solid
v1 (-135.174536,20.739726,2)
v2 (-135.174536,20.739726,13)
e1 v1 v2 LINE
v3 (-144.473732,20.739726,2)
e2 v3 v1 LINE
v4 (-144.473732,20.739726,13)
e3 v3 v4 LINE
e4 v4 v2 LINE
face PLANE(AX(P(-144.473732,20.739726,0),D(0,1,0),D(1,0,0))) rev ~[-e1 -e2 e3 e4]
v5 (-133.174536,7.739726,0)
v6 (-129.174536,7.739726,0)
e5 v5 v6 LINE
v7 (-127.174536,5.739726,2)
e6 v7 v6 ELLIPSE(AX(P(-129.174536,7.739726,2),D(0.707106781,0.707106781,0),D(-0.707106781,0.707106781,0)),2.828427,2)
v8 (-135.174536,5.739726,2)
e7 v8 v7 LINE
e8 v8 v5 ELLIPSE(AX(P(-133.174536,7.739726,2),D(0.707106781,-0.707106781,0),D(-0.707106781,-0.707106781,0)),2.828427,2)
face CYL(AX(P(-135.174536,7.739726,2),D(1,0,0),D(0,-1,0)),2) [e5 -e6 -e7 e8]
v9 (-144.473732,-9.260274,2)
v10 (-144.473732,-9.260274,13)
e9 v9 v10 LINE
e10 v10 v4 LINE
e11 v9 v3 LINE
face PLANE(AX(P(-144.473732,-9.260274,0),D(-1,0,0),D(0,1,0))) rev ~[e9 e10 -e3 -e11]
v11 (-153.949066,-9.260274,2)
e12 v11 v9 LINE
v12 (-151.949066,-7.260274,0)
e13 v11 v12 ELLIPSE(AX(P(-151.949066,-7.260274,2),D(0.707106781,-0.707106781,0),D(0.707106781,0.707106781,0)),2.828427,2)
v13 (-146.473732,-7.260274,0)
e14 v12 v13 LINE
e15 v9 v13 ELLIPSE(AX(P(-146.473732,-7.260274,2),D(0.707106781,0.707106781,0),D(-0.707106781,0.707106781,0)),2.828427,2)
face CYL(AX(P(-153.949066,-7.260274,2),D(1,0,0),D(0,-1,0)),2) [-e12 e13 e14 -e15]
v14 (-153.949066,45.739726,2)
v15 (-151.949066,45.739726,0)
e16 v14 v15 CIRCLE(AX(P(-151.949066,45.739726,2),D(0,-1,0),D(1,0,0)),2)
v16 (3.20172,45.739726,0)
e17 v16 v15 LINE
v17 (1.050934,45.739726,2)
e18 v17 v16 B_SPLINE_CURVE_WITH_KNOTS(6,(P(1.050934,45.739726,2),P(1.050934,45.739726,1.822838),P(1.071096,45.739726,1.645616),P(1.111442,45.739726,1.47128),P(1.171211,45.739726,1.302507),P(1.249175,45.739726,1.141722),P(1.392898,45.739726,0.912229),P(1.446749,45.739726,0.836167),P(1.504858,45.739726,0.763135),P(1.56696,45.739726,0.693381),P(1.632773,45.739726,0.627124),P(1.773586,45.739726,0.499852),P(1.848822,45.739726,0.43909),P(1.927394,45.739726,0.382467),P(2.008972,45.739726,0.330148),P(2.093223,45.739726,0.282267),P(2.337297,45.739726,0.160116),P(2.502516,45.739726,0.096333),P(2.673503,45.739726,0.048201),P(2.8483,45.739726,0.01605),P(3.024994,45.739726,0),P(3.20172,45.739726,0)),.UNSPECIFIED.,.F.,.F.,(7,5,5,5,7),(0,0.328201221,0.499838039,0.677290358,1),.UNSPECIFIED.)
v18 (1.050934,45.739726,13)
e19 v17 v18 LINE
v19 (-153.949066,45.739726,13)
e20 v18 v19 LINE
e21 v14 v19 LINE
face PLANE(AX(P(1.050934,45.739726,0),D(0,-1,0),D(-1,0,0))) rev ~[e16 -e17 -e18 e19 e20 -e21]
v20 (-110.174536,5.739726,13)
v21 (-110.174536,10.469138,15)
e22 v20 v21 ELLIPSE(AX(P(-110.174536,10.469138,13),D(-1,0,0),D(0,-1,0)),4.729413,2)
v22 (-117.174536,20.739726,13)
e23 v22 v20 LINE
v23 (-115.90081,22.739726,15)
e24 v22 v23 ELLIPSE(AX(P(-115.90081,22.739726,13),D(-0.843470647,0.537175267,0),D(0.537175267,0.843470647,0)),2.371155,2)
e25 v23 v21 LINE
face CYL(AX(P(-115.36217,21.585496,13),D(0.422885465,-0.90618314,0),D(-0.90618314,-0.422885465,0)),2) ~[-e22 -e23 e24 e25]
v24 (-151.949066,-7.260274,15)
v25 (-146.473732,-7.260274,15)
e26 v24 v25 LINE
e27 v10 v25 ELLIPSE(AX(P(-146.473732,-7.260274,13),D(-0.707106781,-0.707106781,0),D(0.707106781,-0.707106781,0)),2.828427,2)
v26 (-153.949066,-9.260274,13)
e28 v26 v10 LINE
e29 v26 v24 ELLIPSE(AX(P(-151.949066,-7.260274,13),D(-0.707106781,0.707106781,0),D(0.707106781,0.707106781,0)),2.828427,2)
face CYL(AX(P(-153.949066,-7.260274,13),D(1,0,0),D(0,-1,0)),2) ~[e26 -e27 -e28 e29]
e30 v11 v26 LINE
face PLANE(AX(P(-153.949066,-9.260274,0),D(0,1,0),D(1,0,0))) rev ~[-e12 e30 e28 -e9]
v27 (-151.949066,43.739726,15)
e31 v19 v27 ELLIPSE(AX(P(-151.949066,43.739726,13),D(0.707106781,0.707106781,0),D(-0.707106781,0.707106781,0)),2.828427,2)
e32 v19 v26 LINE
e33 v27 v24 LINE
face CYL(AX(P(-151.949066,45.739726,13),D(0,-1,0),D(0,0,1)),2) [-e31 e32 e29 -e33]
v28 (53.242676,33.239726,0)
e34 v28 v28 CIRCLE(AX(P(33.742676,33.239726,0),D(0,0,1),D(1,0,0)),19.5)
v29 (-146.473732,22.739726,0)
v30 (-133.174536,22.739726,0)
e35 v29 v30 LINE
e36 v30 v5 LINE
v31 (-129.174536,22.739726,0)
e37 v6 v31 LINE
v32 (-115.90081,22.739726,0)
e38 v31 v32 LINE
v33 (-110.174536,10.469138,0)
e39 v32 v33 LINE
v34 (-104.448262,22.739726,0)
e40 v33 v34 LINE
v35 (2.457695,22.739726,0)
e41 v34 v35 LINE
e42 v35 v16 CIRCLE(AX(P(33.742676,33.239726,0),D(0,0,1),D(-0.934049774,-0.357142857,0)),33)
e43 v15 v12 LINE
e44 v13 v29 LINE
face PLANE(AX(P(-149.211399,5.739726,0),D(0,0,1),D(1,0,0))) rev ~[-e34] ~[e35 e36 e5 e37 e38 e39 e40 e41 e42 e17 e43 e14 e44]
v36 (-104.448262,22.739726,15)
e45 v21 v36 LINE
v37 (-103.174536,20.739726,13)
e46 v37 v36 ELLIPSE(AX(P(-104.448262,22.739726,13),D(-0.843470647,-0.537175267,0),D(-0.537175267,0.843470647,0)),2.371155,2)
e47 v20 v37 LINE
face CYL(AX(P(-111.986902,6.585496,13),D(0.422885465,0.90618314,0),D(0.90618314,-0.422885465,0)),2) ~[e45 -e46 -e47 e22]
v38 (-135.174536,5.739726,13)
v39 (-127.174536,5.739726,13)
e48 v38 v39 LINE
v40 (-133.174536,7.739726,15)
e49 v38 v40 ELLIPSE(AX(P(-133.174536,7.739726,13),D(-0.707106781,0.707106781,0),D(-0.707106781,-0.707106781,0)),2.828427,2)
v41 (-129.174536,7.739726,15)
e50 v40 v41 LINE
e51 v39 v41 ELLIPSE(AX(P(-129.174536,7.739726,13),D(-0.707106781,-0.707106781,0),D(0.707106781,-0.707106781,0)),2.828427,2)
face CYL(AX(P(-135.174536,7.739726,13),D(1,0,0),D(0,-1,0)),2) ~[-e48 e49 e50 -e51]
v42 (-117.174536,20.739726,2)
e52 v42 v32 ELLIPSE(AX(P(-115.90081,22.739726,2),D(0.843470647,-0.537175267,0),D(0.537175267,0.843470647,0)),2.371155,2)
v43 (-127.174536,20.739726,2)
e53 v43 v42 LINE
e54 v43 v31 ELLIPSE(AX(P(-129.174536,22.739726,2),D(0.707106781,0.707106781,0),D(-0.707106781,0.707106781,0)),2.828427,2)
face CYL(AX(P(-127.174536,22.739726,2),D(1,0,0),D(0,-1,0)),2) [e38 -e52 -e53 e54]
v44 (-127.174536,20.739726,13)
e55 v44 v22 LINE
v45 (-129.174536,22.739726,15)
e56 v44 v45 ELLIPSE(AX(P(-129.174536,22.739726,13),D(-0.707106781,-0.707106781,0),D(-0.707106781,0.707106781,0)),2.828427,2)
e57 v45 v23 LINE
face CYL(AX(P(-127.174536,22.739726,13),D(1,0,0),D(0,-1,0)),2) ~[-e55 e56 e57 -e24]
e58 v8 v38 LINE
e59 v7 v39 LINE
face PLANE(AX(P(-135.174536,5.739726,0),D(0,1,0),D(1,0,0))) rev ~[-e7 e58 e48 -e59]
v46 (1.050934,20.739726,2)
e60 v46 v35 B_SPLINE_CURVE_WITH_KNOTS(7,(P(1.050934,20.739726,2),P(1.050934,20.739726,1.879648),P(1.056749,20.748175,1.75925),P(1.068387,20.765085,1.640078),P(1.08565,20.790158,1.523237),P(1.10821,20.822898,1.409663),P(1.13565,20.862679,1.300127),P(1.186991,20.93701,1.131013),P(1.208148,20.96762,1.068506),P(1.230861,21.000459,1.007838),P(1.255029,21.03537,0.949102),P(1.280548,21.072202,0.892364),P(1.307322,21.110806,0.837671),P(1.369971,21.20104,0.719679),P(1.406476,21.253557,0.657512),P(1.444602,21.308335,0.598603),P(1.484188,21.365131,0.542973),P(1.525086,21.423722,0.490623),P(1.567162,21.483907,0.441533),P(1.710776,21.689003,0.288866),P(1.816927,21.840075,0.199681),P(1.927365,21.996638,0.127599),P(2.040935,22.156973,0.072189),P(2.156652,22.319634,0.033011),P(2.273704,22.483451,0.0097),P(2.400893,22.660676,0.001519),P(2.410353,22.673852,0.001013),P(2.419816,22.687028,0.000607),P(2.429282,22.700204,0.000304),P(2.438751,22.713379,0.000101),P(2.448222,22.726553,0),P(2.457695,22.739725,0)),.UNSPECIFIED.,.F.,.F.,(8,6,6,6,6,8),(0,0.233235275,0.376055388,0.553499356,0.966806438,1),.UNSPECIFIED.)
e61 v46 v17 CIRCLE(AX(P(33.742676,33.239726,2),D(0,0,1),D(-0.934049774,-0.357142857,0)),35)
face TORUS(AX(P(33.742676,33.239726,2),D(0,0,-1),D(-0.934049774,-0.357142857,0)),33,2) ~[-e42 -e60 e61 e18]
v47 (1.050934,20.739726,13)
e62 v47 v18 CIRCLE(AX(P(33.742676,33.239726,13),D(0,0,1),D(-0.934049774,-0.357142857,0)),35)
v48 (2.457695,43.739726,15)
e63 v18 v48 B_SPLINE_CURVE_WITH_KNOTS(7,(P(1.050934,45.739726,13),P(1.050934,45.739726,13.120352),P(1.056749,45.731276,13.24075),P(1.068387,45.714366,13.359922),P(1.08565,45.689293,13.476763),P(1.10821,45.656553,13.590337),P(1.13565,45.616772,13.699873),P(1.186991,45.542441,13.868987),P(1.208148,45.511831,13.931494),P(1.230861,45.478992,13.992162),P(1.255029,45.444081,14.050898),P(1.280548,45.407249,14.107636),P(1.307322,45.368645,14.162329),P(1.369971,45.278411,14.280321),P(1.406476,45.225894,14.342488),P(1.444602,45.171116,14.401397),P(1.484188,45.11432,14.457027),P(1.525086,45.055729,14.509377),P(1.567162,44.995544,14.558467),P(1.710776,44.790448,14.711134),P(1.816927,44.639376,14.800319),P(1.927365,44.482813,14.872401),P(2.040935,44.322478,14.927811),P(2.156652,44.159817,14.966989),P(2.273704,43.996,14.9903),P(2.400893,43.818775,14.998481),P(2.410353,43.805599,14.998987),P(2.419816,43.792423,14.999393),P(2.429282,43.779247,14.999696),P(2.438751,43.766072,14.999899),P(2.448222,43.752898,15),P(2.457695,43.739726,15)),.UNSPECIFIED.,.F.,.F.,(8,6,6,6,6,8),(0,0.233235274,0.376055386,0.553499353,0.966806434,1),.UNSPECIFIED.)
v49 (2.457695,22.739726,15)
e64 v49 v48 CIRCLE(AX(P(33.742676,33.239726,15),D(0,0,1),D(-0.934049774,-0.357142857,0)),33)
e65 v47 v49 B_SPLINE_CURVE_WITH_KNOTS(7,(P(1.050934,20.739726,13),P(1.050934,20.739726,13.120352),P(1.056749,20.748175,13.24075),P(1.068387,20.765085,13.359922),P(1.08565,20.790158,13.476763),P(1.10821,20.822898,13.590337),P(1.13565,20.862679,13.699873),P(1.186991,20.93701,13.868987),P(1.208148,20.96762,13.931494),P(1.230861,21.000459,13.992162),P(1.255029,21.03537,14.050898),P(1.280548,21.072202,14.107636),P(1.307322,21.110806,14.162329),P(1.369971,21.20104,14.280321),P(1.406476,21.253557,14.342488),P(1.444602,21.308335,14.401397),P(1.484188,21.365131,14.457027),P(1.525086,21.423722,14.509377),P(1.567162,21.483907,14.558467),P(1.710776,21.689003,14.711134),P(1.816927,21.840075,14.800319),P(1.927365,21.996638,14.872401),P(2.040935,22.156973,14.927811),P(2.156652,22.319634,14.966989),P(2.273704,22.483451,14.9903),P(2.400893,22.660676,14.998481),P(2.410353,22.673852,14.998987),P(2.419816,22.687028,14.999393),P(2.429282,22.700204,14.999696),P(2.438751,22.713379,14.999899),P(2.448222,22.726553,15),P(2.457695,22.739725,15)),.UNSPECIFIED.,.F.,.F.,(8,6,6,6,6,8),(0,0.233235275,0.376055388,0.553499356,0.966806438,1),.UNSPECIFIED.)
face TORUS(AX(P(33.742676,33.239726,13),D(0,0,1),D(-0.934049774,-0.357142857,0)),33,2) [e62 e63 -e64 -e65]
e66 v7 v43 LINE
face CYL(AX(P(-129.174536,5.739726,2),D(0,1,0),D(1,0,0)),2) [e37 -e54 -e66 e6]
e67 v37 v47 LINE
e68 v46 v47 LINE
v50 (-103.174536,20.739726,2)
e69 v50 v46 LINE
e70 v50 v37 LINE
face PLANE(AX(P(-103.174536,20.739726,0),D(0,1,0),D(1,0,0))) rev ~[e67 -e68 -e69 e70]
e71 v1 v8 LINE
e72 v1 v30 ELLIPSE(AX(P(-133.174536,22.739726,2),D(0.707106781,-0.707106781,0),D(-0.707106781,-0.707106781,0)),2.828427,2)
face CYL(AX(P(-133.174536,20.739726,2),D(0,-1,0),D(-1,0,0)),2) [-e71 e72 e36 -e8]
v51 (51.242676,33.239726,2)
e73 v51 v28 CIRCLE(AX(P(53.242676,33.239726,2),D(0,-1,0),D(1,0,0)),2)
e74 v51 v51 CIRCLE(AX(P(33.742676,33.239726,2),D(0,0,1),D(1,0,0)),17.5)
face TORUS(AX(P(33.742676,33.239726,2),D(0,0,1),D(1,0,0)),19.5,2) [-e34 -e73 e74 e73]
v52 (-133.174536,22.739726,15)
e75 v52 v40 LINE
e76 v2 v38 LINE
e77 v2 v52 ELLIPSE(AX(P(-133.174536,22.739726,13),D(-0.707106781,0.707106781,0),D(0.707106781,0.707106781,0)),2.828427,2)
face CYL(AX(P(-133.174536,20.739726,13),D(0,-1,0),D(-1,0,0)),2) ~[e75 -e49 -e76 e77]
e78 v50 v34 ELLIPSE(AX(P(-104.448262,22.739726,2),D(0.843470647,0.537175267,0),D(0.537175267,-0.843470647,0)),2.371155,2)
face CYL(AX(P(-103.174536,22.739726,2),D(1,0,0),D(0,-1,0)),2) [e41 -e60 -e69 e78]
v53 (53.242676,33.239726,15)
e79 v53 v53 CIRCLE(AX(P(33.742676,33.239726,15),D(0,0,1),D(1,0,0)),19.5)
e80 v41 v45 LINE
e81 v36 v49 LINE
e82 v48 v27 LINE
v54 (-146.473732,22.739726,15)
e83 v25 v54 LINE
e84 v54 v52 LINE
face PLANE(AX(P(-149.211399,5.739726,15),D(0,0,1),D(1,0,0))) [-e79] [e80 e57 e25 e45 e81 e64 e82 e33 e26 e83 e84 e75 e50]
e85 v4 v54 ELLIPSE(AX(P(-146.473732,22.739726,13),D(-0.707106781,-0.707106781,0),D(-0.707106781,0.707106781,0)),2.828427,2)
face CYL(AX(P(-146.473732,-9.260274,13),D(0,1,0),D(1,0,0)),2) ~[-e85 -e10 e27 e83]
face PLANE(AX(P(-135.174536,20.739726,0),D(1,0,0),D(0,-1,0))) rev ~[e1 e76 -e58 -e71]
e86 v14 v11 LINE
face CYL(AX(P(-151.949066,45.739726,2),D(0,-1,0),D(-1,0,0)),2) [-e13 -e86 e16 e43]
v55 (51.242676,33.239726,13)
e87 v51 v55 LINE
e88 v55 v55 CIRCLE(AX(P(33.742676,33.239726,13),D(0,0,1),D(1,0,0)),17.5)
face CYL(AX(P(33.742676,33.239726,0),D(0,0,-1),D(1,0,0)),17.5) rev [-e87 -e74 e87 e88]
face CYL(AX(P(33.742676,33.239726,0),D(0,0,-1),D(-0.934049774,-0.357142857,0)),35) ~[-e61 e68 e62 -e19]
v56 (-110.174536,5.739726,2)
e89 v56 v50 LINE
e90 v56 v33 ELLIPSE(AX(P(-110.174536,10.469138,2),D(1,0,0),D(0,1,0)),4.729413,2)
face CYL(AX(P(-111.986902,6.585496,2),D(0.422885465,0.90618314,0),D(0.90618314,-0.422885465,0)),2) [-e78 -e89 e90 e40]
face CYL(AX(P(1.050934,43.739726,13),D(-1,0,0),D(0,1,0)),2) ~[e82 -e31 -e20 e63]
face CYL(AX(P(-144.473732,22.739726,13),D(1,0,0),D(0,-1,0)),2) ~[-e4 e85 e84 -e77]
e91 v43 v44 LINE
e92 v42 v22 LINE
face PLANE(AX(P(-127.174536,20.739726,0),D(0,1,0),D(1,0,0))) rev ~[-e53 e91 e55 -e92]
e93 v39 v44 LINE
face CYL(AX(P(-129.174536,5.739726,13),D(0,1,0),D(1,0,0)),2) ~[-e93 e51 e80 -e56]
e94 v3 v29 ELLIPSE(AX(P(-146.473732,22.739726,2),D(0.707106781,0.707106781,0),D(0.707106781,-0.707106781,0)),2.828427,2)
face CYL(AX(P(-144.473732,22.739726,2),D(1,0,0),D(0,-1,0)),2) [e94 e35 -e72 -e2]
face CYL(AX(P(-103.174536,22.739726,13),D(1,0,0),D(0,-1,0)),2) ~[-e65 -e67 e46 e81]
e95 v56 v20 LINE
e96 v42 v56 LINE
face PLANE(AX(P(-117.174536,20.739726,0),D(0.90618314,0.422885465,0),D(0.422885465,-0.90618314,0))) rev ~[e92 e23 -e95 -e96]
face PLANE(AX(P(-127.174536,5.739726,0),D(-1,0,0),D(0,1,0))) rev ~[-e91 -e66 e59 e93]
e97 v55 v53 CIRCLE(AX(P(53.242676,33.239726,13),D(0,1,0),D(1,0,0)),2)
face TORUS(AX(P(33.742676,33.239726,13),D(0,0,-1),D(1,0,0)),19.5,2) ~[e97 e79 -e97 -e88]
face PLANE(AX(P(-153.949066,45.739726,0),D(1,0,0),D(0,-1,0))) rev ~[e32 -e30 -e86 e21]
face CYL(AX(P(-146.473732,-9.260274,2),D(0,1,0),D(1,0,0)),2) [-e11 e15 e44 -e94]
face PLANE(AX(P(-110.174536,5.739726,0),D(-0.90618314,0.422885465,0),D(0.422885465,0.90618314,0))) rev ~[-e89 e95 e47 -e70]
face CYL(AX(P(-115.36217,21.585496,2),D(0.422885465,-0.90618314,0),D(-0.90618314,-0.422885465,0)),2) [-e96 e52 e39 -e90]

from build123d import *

# Parameters (mm, degrees)
F0_W     = 9.4753347638
F0_H     = 30
F0_R     = 17.5
F1_DEPTH = 15
F2_R     = 2
F3_R     = 2


# Not quite as in the source:
# - a feature names something its author has since deleted; it is built from what else it names


with BuildPart() as f1:
    # F0 (on Top) → F1 (new body)
    with BuildSketch(Plane.XY):
        with Locations((-149.2113988997, 5.7397255301)):
            Rectangle(F0_W, F0_H)
        Polygon((1.0509337184, 20.7397255301), (1.0509337184, 45.7397255301), (-153.9490662816, 45.7397255301), (-153.9490662816, 20.7397255301), (-144.4737315178, 20.7397255301), (-135.1745359898, 20.7397255301), (-134.4737315178, 20.7397255301), (-127.1745359898, 20.7397255301), (-117.1745359898, 20.7397255301), (-103.1745359898, 20.7397255301), align=None)
        with BuildLine():
            ThreePointArc((1.0509337184, 20.7397255301), (68.742675795, 33.2397255301), (1.0509337184, 45.7397255301))
            Line((1.0509337184, 45.7397255301), (1.0509337184, 20.7397255301))
        make_face()
        with Locations((33.742675795, 33.2397255301)):
            Circle(F0_R, mode=Mode.SUBTRACT)
        Polygon((-134.4737315178, 20.7397255301), (-135.1745359898, 20.7397255301), (-135.1745359898, 5.7397255301), (-134.4737315178, 5.7397255301), (-127.1745359898, 5.7397255301), (-127.1745359898, 20.7397255301), align=None)
        Polygon((-110.1745359898, 5.7397255301), (-103.1745359898, 20.7397255301), (-117.1745359898, 20.7397255301), align=None)
    extrude(amount=F1_DEPTH)

    # F2
    f2_edges = [f1.edges().sort_by_distance(p)[0] for p in [
        (68.742676, 33.239726, 0),
        (16.242676, 33.239726, 0),
        (-51.061801, 20.739726, 0),
        (-106.674536, 13.239726, 0),
        (-127.174536, 13.239726, 0),
        (-122.174536, 20.739726, 0),
        (-113.674536, 13.239726, 0),
        (-135.174536, 13.239726, 0),
        (-131.174536, 5.739726, 0),
        (-139.824134, 20.739726, 0),
        (-144.473732, 5.739726, 0),
        (-149.211399, -9.260274, 0),
        (-153.949066, 18.239726, 0),
    ]]
    fillet(f2_edges, radius=F2_R)

    # F3
    f3_edges = [f1.edges().sort_by_distance(p)[0] for p in [
        (-149.211399, -9.260274, 15),
        (-144.473732, 5.739726, 15),
        (-139.824134, 20.739726, 15),
        (-135.174536, 13.239726, 15),
        (-131.174536, 5.739726, 15),
        (-127.174536, 13.239726, 15),
        (-122.174536, 20.739726, 15),
        (-113.674536, 13.239726, 15),
        (-106.674536, 13.239726, 15),
        (-51.061801, 20.739726, 15),
        (68.742676, 33.239726, 15),
        (-76.449066, 45.739726, 15),
        (-153.949066, 18.239726, 15),
        (16.242676, 33.239726, 15),
    ]]
    fillet(f3_edges, radius=F3_R)


solid = f1.part
